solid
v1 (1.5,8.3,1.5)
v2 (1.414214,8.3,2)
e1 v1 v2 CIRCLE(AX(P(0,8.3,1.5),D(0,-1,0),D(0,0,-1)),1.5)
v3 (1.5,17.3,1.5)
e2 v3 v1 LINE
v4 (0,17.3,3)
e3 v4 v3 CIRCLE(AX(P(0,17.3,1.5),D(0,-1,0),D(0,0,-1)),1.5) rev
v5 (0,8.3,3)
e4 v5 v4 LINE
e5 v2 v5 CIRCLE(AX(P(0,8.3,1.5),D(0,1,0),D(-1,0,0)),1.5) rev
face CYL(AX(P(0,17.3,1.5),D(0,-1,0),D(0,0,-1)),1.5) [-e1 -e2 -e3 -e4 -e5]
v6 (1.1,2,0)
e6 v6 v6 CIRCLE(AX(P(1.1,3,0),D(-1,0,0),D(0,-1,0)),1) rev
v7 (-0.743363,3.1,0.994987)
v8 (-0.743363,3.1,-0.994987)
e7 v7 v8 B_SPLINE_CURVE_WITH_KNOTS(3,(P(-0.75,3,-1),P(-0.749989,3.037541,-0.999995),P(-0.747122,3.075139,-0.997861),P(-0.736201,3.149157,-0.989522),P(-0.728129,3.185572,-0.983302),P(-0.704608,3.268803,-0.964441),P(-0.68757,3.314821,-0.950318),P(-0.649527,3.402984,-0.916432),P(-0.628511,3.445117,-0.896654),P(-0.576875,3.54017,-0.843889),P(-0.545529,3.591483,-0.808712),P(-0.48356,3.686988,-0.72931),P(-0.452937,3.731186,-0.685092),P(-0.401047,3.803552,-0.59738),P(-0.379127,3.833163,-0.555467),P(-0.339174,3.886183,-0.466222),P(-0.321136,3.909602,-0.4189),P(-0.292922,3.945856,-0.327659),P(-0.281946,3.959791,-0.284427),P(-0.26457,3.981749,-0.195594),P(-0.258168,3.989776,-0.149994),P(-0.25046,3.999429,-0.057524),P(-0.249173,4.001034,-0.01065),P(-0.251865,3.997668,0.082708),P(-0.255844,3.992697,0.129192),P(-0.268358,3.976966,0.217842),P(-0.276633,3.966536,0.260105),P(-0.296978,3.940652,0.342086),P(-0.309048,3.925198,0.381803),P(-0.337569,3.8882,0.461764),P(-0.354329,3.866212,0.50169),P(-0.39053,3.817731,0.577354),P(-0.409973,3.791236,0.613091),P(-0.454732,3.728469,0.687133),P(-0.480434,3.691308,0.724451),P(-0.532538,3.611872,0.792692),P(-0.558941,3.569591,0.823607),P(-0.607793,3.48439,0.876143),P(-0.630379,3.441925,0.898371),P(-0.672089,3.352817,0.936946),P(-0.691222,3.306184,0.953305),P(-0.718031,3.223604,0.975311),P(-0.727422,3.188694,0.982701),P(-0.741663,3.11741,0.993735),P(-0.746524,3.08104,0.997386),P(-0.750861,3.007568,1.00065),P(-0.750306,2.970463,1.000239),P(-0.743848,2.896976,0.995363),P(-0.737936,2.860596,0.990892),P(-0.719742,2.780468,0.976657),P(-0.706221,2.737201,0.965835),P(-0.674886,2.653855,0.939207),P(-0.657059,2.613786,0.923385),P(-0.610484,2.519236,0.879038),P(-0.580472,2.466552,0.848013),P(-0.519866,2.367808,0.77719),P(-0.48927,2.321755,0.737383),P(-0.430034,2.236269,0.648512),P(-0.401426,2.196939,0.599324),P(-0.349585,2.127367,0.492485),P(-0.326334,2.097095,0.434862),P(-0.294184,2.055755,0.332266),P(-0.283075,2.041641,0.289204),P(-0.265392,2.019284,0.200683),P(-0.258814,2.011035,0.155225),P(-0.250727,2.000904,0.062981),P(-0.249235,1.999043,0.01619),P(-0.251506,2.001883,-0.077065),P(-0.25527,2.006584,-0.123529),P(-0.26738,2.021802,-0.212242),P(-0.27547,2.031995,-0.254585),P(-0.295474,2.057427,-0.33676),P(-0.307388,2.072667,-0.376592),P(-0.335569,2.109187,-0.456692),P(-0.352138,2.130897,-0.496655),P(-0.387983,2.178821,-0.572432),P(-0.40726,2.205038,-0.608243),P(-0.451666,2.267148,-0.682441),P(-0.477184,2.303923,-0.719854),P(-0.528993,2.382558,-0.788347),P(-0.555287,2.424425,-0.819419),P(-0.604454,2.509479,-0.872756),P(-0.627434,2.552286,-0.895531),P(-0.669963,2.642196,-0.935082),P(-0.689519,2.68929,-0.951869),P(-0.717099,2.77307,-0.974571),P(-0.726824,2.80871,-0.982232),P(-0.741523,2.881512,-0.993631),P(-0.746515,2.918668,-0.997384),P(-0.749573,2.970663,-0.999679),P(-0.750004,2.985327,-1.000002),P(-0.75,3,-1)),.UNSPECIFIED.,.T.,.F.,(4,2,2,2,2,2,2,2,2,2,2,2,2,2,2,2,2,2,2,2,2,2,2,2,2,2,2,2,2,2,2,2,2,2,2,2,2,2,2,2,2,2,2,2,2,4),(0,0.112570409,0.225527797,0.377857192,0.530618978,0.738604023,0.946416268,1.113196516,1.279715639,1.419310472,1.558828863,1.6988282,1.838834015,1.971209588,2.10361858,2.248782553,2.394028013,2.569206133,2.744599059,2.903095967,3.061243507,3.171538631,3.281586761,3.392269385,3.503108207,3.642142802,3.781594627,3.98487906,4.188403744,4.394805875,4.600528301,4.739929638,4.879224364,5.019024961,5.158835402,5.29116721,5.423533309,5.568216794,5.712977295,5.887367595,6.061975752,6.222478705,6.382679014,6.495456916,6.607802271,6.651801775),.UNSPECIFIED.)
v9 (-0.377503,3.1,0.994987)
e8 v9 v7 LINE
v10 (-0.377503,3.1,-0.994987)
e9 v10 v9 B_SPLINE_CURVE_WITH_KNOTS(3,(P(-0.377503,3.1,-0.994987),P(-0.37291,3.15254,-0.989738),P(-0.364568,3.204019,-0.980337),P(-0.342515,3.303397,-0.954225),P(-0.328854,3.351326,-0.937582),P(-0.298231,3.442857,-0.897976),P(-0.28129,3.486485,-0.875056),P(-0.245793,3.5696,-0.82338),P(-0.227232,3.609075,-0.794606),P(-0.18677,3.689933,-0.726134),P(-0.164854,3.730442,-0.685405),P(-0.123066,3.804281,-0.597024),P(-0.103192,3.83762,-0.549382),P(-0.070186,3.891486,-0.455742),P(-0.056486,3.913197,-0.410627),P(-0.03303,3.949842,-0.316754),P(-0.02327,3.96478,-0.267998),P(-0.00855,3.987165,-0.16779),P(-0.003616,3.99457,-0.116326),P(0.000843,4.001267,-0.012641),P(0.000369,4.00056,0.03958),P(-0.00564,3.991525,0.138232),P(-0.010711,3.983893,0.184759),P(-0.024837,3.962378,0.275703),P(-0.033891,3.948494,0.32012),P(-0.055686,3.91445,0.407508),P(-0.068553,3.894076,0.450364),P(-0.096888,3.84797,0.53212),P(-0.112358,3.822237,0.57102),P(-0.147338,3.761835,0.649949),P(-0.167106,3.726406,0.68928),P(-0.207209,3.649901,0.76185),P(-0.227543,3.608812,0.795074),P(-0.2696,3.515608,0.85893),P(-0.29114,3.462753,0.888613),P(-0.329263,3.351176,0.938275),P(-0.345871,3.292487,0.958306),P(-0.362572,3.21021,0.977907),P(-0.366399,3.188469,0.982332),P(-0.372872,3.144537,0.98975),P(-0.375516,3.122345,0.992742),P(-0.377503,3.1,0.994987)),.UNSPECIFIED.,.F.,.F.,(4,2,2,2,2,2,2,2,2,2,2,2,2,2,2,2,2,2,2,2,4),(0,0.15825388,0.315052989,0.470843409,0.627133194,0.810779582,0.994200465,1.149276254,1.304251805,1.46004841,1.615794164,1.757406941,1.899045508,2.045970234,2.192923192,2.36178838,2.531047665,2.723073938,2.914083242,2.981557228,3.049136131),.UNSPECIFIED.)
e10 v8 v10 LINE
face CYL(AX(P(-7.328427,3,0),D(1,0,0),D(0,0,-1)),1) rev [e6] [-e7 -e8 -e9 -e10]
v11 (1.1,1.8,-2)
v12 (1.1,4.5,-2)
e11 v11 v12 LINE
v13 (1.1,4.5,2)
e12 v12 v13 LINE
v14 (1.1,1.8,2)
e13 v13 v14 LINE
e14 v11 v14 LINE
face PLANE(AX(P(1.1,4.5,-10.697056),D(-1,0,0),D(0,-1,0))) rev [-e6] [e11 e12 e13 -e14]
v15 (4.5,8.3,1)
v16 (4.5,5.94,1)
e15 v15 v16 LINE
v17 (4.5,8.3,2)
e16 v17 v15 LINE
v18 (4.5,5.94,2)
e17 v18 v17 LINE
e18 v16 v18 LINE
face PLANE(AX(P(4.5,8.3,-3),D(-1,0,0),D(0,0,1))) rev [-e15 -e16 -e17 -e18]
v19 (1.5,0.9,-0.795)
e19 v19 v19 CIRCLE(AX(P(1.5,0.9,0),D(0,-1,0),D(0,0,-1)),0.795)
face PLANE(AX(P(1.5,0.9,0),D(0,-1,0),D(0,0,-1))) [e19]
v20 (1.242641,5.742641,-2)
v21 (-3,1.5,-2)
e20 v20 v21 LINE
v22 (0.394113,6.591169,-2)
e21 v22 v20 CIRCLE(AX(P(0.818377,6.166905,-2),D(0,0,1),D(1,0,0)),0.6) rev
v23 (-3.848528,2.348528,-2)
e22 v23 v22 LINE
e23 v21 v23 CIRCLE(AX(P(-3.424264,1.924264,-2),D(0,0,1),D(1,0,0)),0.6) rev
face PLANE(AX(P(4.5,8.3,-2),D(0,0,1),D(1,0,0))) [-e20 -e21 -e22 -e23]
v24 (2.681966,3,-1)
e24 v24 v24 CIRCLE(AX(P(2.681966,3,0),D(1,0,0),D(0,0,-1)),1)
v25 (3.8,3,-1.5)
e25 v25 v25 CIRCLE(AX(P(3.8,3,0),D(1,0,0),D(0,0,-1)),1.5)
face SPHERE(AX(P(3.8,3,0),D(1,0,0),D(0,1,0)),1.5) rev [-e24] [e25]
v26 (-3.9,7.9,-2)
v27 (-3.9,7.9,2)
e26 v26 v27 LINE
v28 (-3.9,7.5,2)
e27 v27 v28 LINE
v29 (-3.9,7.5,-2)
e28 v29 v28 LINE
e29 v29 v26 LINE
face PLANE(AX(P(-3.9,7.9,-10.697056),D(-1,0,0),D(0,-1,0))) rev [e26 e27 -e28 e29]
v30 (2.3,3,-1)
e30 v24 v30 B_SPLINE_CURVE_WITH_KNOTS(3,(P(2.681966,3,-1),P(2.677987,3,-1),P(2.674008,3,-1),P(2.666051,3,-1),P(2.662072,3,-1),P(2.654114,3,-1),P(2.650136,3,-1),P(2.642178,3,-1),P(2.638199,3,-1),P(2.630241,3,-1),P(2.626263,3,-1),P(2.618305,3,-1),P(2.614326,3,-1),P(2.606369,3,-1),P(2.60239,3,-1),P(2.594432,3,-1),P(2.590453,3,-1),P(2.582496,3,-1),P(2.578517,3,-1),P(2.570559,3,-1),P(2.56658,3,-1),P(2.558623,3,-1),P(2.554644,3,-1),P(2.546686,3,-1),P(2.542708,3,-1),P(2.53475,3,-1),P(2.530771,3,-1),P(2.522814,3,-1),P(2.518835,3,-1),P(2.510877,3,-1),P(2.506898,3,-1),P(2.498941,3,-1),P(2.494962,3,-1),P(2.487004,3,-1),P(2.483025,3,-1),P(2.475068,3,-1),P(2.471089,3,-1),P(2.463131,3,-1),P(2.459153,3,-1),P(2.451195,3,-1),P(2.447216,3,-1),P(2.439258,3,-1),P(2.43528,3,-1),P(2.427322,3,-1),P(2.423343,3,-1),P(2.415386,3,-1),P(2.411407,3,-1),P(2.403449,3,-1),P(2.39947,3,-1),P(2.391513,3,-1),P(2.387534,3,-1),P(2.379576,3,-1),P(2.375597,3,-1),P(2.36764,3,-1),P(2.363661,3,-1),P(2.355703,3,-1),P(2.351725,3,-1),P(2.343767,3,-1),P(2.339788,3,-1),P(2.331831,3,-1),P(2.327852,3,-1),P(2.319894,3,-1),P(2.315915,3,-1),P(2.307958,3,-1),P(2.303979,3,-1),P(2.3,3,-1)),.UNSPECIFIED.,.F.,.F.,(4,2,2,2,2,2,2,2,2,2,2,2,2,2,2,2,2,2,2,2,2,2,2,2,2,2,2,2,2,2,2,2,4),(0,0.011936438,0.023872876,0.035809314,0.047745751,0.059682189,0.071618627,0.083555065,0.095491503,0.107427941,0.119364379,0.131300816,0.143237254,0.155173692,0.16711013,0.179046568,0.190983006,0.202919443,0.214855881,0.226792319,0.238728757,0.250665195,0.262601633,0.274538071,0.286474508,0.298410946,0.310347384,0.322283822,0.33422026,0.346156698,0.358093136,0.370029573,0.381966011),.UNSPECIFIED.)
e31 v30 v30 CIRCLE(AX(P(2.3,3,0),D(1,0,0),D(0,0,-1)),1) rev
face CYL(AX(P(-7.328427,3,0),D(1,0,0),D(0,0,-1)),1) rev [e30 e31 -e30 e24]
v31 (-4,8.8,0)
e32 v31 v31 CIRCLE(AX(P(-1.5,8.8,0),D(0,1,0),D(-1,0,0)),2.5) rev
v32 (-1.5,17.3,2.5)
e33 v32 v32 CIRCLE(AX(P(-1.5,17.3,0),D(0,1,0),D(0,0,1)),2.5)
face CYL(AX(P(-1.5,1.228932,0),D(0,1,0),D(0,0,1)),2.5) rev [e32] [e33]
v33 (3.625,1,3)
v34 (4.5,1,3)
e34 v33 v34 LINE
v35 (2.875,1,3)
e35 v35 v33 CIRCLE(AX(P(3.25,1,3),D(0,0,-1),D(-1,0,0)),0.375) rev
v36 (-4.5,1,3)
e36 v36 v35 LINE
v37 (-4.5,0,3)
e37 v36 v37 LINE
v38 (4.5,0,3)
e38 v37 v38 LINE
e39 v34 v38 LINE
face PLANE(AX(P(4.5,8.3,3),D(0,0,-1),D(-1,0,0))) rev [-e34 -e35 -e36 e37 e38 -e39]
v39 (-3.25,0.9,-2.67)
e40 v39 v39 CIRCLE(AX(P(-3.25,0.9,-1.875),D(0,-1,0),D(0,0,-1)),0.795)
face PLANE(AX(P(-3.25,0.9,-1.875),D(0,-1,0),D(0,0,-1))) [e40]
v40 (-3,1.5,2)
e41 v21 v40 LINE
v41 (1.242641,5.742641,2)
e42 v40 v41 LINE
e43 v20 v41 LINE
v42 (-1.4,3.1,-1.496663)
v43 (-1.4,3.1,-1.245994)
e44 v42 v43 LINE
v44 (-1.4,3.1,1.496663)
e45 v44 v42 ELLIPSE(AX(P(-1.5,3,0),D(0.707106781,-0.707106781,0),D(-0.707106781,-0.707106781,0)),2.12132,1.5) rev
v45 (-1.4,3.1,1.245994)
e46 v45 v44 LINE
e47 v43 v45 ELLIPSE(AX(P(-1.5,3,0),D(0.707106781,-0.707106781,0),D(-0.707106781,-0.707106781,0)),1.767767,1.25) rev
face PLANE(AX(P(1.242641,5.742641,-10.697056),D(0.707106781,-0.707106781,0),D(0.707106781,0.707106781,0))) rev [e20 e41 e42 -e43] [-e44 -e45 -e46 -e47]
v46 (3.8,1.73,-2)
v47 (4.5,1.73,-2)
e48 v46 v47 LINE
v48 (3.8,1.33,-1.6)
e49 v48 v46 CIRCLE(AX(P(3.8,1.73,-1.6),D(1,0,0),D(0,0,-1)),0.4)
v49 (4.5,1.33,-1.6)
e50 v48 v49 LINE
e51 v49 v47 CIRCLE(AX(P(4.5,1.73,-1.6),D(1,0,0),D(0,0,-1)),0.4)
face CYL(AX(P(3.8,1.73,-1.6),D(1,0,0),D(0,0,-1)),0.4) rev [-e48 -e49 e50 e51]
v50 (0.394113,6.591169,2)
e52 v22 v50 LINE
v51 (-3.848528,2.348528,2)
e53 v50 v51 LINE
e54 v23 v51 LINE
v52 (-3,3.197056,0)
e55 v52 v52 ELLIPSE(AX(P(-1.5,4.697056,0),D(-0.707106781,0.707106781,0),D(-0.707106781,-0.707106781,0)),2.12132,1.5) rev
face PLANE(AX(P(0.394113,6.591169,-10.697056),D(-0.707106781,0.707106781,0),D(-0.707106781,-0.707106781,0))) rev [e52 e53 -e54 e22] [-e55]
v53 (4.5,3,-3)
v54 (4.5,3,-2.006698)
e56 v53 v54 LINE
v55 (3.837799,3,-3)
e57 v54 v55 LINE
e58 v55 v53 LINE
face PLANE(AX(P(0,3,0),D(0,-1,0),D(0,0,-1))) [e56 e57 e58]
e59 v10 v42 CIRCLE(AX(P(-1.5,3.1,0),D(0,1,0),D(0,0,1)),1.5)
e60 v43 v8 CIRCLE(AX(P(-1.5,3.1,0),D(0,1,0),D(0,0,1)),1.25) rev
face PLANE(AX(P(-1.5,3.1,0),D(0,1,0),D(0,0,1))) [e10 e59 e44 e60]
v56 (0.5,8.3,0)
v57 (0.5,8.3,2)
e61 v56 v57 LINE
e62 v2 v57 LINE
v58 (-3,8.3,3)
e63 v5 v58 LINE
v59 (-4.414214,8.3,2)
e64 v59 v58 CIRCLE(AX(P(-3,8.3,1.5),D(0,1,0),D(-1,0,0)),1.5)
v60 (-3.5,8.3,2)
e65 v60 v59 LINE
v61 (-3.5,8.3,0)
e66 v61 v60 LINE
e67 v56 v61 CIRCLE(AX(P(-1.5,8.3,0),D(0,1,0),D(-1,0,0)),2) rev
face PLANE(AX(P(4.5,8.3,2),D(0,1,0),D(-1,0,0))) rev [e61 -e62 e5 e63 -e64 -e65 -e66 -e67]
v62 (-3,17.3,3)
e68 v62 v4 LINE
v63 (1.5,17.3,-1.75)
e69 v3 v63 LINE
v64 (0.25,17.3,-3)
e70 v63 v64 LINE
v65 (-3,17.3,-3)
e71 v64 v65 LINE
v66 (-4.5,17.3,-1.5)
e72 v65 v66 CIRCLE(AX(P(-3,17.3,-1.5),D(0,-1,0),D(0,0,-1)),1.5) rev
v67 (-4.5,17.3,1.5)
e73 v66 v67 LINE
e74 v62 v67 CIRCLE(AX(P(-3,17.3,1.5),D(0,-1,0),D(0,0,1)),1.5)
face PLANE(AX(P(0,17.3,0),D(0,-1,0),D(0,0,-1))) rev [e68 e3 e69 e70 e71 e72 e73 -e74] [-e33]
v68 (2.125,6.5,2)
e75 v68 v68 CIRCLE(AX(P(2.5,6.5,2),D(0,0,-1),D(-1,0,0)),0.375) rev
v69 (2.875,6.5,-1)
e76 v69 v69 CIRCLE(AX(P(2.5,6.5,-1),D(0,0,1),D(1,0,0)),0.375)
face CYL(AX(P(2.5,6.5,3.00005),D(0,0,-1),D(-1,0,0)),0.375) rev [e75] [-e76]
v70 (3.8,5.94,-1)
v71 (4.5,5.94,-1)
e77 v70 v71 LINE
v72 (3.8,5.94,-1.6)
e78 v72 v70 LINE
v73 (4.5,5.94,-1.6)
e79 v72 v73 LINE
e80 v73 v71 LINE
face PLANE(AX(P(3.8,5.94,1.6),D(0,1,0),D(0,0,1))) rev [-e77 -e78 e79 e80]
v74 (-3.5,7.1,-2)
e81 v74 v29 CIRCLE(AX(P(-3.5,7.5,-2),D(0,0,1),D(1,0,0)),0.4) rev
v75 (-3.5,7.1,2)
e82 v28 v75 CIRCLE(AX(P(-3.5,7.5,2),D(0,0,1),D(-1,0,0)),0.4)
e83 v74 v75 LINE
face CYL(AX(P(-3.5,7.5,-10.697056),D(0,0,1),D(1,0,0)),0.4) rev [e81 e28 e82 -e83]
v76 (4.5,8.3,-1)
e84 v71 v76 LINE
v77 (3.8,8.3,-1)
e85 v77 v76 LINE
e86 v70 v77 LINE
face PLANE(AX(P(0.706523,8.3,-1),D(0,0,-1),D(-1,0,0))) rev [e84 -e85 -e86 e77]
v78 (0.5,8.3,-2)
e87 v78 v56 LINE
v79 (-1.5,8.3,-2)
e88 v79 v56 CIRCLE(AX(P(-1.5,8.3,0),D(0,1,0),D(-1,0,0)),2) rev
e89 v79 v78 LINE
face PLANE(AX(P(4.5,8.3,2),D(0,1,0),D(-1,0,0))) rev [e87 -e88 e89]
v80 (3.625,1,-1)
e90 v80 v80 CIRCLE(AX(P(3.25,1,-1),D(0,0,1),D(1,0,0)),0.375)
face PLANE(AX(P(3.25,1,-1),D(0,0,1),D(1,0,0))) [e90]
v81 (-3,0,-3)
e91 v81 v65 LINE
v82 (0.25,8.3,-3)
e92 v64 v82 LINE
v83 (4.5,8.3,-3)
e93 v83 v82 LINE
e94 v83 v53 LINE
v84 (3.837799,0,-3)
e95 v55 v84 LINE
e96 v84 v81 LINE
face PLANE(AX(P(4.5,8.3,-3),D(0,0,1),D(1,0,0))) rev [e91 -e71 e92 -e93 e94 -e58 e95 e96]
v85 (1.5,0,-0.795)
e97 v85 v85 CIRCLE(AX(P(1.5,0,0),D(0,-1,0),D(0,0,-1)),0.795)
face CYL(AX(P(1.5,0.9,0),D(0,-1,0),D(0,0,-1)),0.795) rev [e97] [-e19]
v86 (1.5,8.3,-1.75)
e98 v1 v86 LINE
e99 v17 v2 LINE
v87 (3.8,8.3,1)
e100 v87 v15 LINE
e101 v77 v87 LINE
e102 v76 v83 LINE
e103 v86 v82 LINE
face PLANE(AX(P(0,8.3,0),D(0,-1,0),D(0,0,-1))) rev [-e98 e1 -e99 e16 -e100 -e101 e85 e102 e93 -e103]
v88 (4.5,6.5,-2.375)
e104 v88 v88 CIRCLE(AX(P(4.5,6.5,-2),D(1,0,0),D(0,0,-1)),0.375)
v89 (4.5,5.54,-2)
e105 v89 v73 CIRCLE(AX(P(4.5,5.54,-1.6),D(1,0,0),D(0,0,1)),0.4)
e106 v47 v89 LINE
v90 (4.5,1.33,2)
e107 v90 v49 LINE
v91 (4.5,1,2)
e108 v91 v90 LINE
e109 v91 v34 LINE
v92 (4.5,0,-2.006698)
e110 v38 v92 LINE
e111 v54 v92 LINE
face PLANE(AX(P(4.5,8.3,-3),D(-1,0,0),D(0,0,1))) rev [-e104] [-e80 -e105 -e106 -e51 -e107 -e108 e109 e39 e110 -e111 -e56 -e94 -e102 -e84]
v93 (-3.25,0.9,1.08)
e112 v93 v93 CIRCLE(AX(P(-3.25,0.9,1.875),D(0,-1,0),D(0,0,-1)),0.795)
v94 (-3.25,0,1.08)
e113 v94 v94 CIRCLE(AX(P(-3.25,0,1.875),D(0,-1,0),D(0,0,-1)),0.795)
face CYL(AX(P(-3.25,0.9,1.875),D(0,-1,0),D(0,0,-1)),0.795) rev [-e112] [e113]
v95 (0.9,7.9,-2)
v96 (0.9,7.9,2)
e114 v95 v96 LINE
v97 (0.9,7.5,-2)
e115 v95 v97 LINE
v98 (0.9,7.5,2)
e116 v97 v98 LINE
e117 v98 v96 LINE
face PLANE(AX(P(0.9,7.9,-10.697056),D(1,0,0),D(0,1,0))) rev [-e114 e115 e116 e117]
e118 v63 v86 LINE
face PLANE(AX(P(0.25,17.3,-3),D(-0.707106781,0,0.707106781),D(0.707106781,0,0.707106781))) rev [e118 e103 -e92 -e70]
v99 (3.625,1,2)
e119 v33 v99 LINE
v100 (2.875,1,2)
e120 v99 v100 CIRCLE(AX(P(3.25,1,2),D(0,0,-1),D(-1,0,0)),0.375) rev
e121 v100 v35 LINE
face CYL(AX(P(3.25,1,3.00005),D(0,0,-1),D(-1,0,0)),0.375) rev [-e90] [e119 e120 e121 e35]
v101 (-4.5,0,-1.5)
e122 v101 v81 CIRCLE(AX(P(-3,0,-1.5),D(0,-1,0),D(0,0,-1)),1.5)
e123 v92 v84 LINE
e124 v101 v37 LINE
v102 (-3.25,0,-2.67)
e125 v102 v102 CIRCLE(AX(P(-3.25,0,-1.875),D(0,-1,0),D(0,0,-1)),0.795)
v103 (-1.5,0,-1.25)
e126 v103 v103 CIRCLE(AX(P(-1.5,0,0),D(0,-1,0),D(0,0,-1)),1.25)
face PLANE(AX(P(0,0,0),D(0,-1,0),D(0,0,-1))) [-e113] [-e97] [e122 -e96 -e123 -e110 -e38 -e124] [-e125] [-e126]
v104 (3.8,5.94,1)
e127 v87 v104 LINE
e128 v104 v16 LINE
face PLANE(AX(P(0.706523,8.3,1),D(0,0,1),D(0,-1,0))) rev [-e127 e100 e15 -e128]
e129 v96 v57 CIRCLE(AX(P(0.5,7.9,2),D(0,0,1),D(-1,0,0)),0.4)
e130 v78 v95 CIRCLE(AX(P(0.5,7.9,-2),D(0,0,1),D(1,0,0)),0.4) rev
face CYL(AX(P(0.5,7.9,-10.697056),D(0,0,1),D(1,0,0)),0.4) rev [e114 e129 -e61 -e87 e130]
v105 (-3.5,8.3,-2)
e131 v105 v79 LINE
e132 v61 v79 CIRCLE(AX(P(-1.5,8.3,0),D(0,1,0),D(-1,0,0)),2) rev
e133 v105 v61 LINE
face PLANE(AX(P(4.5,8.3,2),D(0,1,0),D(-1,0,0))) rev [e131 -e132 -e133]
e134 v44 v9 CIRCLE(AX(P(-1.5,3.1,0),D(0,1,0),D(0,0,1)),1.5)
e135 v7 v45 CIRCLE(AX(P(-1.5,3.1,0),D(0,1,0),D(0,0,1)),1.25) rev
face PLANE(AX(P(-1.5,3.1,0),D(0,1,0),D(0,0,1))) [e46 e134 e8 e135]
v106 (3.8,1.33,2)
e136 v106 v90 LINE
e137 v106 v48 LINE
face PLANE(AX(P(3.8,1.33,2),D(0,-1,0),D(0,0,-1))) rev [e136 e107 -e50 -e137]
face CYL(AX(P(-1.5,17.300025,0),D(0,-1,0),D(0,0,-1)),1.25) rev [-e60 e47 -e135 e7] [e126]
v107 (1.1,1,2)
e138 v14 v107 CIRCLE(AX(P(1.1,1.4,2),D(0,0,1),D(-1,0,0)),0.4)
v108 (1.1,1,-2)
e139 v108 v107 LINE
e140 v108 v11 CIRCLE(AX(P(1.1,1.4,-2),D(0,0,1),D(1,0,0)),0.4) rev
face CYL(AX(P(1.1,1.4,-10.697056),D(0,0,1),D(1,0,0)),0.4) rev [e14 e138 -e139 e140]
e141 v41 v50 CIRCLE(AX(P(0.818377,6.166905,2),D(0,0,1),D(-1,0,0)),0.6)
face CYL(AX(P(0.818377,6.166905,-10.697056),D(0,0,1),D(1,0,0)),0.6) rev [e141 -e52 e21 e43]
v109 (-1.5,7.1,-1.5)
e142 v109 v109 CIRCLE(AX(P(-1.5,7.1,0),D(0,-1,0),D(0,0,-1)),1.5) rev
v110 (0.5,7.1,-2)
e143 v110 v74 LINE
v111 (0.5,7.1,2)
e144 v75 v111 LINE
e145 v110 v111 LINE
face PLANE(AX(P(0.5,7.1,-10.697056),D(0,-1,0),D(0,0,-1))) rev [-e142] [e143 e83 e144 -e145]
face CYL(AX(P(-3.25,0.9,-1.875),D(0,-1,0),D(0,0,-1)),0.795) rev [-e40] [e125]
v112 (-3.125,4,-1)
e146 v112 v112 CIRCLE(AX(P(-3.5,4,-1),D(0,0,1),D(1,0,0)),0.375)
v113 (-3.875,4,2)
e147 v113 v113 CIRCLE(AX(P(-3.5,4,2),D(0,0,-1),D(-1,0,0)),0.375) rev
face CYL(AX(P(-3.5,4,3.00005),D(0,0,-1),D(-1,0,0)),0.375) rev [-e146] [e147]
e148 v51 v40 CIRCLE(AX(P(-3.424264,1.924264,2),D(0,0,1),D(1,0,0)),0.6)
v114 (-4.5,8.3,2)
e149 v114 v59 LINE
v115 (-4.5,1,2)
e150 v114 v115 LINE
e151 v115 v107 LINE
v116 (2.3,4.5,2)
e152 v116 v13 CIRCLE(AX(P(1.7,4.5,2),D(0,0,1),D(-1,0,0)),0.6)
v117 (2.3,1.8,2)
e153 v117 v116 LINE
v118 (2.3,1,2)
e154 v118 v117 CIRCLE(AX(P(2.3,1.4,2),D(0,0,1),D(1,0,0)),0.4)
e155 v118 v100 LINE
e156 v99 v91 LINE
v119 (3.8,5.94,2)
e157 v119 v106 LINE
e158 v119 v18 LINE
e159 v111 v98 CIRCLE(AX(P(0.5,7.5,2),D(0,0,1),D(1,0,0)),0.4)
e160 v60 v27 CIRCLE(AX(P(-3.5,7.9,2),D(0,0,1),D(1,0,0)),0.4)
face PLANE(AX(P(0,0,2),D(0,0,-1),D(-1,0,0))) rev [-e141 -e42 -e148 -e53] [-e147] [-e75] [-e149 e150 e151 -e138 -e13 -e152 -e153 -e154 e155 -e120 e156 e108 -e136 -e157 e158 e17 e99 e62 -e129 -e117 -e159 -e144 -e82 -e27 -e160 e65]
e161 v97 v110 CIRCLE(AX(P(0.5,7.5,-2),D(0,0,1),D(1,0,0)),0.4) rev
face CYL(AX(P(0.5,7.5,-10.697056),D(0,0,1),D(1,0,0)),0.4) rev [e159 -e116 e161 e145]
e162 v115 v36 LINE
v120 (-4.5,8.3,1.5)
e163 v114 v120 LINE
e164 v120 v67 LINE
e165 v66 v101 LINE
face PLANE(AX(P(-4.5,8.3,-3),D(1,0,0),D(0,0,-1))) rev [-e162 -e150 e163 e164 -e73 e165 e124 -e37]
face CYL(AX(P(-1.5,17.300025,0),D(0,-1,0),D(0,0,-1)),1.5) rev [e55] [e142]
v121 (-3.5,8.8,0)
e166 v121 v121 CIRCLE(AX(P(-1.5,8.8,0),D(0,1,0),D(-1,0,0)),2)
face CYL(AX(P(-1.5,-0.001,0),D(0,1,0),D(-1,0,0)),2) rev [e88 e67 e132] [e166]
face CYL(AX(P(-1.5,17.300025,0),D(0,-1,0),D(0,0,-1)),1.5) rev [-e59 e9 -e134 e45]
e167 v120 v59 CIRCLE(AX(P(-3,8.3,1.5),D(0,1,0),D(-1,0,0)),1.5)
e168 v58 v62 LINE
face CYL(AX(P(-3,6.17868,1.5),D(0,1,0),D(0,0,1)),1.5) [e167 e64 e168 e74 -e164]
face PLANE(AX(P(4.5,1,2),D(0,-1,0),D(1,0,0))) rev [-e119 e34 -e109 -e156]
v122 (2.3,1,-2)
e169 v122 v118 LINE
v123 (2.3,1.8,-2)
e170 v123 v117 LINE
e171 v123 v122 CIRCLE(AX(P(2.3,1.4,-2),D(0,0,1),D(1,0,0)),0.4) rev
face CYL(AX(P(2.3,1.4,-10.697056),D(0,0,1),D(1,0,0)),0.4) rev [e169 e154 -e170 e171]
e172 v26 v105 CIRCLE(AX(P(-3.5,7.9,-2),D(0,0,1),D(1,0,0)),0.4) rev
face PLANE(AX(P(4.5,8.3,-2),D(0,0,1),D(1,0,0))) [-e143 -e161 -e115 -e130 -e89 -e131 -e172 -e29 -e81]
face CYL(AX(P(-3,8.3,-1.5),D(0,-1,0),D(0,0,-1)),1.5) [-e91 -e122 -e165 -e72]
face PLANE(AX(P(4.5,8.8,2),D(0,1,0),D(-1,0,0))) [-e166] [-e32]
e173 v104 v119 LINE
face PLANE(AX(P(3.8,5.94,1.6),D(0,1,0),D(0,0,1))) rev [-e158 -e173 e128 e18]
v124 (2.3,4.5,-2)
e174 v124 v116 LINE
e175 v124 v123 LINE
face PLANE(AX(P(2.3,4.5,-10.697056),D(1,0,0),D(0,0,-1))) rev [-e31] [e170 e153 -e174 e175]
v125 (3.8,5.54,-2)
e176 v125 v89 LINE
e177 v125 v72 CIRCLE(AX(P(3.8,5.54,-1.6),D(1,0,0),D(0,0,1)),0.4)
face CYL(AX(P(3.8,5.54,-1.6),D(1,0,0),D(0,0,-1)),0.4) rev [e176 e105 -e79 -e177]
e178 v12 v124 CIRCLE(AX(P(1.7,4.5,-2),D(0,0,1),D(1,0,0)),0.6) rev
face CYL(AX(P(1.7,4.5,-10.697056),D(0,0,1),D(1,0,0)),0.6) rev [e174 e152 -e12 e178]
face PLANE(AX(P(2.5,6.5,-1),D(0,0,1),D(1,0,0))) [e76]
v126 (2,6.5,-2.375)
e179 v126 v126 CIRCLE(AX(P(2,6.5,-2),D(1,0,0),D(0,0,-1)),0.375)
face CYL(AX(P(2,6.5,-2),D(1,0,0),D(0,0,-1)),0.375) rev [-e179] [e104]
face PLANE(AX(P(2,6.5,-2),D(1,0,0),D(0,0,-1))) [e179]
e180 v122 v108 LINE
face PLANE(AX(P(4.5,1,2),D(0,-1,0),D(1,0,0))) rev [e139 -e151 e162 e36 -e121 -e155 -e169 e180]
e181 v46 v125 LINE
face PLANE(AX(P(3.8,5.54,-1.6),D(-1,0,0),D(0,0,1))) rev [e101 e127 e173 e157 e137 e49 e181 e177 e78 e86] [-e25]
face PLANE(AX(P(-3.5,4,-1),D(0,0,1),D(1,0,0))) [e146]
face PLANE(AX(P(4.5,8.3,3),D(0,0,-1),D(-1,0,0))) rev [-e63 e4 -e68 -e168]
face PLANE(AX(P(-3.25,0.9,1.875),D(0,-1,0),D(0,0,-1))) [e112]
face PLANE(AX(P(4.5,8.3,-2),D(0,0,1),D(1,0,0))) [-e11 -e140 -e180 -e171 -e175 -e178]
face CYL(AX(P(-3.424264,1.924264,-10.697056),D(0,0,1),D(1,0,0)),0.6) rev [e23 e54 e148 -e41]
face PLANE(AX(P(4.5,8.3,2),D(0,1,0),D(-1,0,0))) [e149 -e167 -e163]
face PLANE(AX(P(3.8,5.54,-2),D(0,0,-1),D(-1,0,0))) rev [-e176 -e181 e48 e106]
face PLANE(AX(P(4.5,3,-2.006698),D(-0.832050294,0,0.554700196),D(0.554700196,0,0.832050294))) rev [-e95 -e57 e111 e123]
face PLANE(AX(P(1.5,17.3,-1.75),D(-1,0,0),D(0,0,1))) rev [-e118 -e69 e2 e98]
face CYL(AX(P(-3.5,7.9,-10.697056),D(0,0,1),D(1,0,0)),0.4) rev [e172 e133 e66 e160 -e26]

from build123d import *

# Parameters (mm, degrees)
SKETCH1_W                   = 9
SKETCH1_H                   = 6
MAIN_BODY_EXT_DEPTH         = 8.3
EMISSION_PATH_EXT_DEPTH     = 9
SKETCH3_R                   = 1.25
EMISSION_AND_GRIN_CUT_DEPTH = 19.125672401
SKETCH4_R                   = 1
DRUM_LENS_CUT_DEPTH         = 7
SKETCH5_W                   = 9
SKETCH5_H                   = 7.3
FILTERSET_CUT1_DEPTH        = 1
FILTERSET_CUT2_DEPTH        = 4
SKETCH10_R                  = 2.5
EMISSION_LENS_CUT_DEPTH     = 8.5
SKETCH15_R                  = 0.795
MAGNETS_CUT_DEPTH           = 0.9
SCREW_HOLES_CUT_DEPTH       = 19.561788707
SCREW_HOLES_CUT_DEPTH_BACK  = 3
SKETCH18_R                  = 0.375
EXTERNAL_FILLET_1_R         = 1.5
CUT_EXTRUDE8_DEPTH          = 12.545128843
CUT_EXTRUDE8_DEPTH_BACK     = 4
SKETCH28_R                  = 1.5
CUT_EXTRUDE9_DEPTH          = 3
CUT_EXTRUDE10_DEPTH         = 0.7
SKETCH29_R                  = 0.375
CUT_EXTRUDE11_DEPTH         = 2.5
SKETCH32_W                  = 2
SKETCH32_H                  = 2.36
CUT_EXTRUDE14_DEPTH         = 0.7
CUT_EXTRUDE16_DEPTH         = 9
CUT_EXTRUDE17_REACH         = 12.329
SKETCH37_R                  = 2


with BuildPart() as part:
    # Sketch1 → Main Body Ext (new body)
    with BuildSketch(Plane(origin=(0, 0, 0), x_dir=(1, 0, 0), z_dir=(0, 1, 0))):
        Rectangle(SKETCH1_W, SKETCH1_H)
    extrude(amount=MAIN_BODY_EXT_DEPTH)

    # Sketch8 → Emission Path Ext (add)
    with BuildSketch(Plane(origin=(0, 8.3, 0), x_dir=(1, 0, 0), z_dir=(0, 1, 0))):
        Polygon((0.25, 3), (1.5, 1.75), (1.5, -3), (-4.5, -3), (-4.5, 3), align=None)
    extrude(amount=EMISSION_PATH_EXT_DEPTH)

    # Sketch3 → Emission and Grin Cut (cut, through all)
    with BuildSketch(Plane.XZ):
        with Locations(Location((-1.5, 0, 0), (0, 0, 270))):
            Circle(SKETCH3_R)
    extrude(amount=-EMISSION_AND_GRIN_CUT_DEPTH, mode=Mode.SUBTRACT)

    # Sketch4 → Drum Lens Cut (cut)
    with BuildSketch(Plane(origin=(4.5, 0, 0), x_dir=(0, 0, -1), z_dir=(1, 0, 0))):
        with Locations((0, 3)):
            Circle(SKETCH4_R)
    extrude(amount=-DRUM_LENS_CUT_DEPTH, mode=Mode.SUBTRACT)

    # Sketch5 → FilterSet Cut1 (cut)
    with BuildSketch(Plane.XY.offset(3)):
        with Locations((0, 4.65)):
            Rectangle(SKETCH5_W, SKETCH5_H)
    extrude(amount=-FILTERSET_CUT1_DEPTH, mode=Mode.SUBTRACT)

    # Sketch6 → FilterSet Cut2 (cut)
    with BuildSketch(Plane.XY.offset(2)):
        with BuildLine():
            Line((2.3, 4.5), (2.3, 1.8))
            ThreePointArc((2.3, 1.8), (2.7, 1.4), (2.3, 1))
            Line((2.3, 1), (1.1, 1))
            ThreePointArc((1.1, 1), (0.7, 1.4), (1.1, 1.8))
            Line((1.1, 1.8), (1.1, 4.5))
            ThreePointArc((1.1, 4.5), (1.7, 5.1), (2.3, 4.5))
        make_face()
        with BuildLine():
            Line((-3.9, 7.9), (-3.9, 7.5))
            ThreePointArc((-3.9, 7.5), (-3.782842712, 7.217157288), (-3.5, 7.1))
            Line((-3.5, 7.1), (0.5, 7.1))
            ThreePointArc((0.5, 7.1), (0.782842712, 7.217157288), (0.9, 7.5))
            Line((0.9, 7.5), (0.9, 7.9))
            ThreePointArc((0.9, 7.9), (0.782842712, 8.182842712), (0.5, 8.3))
            Line((0.5, 8.3), (-3.5, 8.3))
            ThreePointArc((-3.5, 8.3), (-3.782842712, 8.182842712), (-3.9, 7.9))
        make_face()
        with BuildLine():
            Line((0.39411255, 6.591168825), (-3.848528137, 2.348528137))
            ThreePointArc((-3.848528137, 2.348528137), (-3.848528137, 1.5), (-3, 1.5))
            Line((-3, 1.5), (1.242640687, 5.742640687))
            ThreePointArc((1.242640687, 5.742640687), (1.242640687, 6.591168825), (0.39411255, 6.591168825))
        make_face()
    extrude(amount=-FILTERSET_CUT2_DEPTH, mode=Mode.SUBTRACT)

    # Sketch10 → Emission Lens Cut (cut)
    with BuildSketch(Plane(origin=(0, 17.3, 0), x_dir=(1, 0, 0), z_dir=(0, 1, 0))):
        with Locations(Location((-1.5, 0, 0), (0, 0, 270))):
            Circle(SKETCH10_R)
    extrude(amount=-EMISSION_LENS_CUT_DEPTH, mode=Mode.SUBTRACT)

    # Sketch15 → Magnets Cut (cut)
    with BuildSketch(Plane.XZ):
        with Locations(Location((-3.25, -1.875, 0), (0, 0, 270))):
            Circle(SKETCH15_R)
        with Locations(Location((-3.25, 1.875, 0), (0, 0, 270))):
            Circle(SKETCH15_R)
        with Locations(Location((1.5, 0, 0), (0, 0, 270))):
            Circle(SKETCH15_R)
    extrude(amount=-MAGNETS_CUT_DEPTH, mode=Mode.SUBTRACT)

    # Sketch18 → Screw Holes Cut (cut, two sides: drawn at the far end of the back side and taken through both)
    with BuildSketch(Plane.XY.offset(2).offset(-SCREW_HOLES_CUT_DEPTH_BACK)):
        with Locations(Location((-3.5, 4, 0), (0, 0, 180))):
            Circle(SKETCH18_R)
        with Locations(Location((2.5, 6.5, 0), (0, 0, 180))):
            Circle(SKETCH18_R)
        with Locations((3.25, 1)):
            Circle(SKETCH18_R)
    extrude(amount=SCREW_HOLES_CUT_DEPTH + SCREW_HOLES_CUT_DEPTH_BACK, mode=Mode.SUBTRACT)

    # External Fillet 1
    # the kernel refuses this fillet: 1.5 mm, written as the material it takes off along each edge
    with BuildSketch(Plane(origin=(1.5, 8.3, 3), x_dir=(0, 0, -1), z_dir=(0, 1, 0))) as external_fillet_1_piece_1:
        with BuildLine():
            CenterArc((EXTERNAL_FILLET_1_R, EXTERNAL_FILLET_1_R), EXTERNAL_FILLET_1_R, 180, 90)
            Line((0, EXTERNAL_FILLET_1_R), (0, 0))
            Line((0, 0), (EXTERNAL_FILLET_1_R, 0))
        make_face()
    extrude(amount=12.75, mode=Mode.SUBTRACT)
    with BuildSketch(Plane(origin=(-4.5, -3.75, -3), x_dir=(1, 0, 0), z_dir=(0, 1, 0))) as external_fillet_1_piece_2:
        with BuildLine():
            CenterArc((EXTERNAL_FILLET_1_R, -EXTERNAL_FILLET_1_R), EXTERNAL_FILLET_1_R, 90, 90)
            Line((0, -EXTERNAL_FILLET_1_R), (0, 0))
            Line((0, 0), (EXTERNAL_FILLET_1_R, 0))
        make_face()
    extrude(amount=24.8, mode=Mode.SUBTRACT)

    # Sketch28 → Cut-Extrude8 (cut, two sides: drawn at the far end of the back side and taken through both)
    with BuildSketch(Plane(origin=(0, 7.1, 0), x_dir=(1, 0, 0), z_dir=(0, 1, 0)).offset(-CUT_EXTRUDE8_DEPTH_BACK)):
        with Locations(Location((-1.5, 0, 0), (0, 0, 180))):
            Circle(SKETCH28_R)
    extrude(amount=CUT_EXTRUDE8_DEPTH + CUT_EXTRUDE8_DEPTH_BACK, mode=Mode.SUBTRACT)

    # Sketch14 → Cut-Extrude9 (cut)
    with BuildSketch(Plane.XZ):
        Polygon((4.5, -3), (4.5, -2.006698359), (3.837798906, -3), align=None)
    extrude(amount=-CUT_EXTRUDE9_DEPTH, mode=Mode.SUBTRACT)

    # Sketch12 → Cut-Extrude10 (cut)
    with BuildSketch(Plane(origin=(4.5, 0, 0), x_dir=(0, 0, -1), z_dir=(1, 0, 0))):
        with BuildLine():
            Line((1.6, 5.94), (-1.6, 5.94))
            Line((-1.6, 5.94), (-2, 5.94))
            Line((-2, 5.94), (-2, 1.33))
            Line((-2, 1.33), (1.6, 1.33))
            ThreePointArc((1.6, 1.33), (1.882842712, 1.447157288), (2, 1.73))
            Line((2, 1.73), (2, 5.54))
            ThreePointArc((2, 5.54), (1.882842712, 5.822842712), (1.6, 5.94))
        make_face()
    extrude(amount=-CUT_EXTRUDE10_DEPTH, mode=Mode.SUBTRACT)

    # Sketch29 → Cut-Extrude11 (cut)
    with BuildSketch(Plane(origin=(4.5, 0, 0), x_dir=(0, 0, -1), z_dir=(1, 0, 0))):
        with Locations((2, 6.5)):
            Circle(SKETCH29_R)
    extrude(amount=-CUT_EXTRUDE11_DEPTH, mode=Mode.SUBTRACT)

    # Sketch32 → Cut-Extrude14 (cut)
    with BuildSketch(Plane(origin=(4.5, 0, 0), x_dir=(0, 0, -1), z_dir=(1, 0, 0))):
        with Locations((0, 7.12)):
            Rectangle(SKETCH32_W, SKETCH32_H)
    extrude(amount=-CUT_EXTRUDE14_DEPTH, mode=Mode.SUBTRACT)

    # Sketch33 → Cut-Revolve1 (revolve, cut)
    with BuildSketch(Plane.XY, mode=Mode.PRIVATE) as cut_revolve1_sk:
        with BuildLine():
            Line((3.8, 3), (2.3, 3))
            ThreePointArc((2.3, 3), (2.739339828, 4.060660172), (3.8, 4.5))
            Line((3.8, 4.5), (3.8, 3))
        make_face()
    revolve(cut_revolve1_sk.sketch.rotate(Axis((3.8, 3, 0), (-1, 0, 0)), 90), axis=Axis((3.8, 3, 0), (-1, 0, 0)), mode=Mode.SUBTRACT)

    # Sketch36 → Cut-Extrude16 (cut)
    with BuildSketch(Plane(origin=(0, 17.3, 0), x_dir=(1, 0, 0), z_dir=(0, 1, 0))):
        with BuildLine():
            Line((-4.5, -1.5), (-4.5, -3))
            Line((-4.5, -3), (-3, -3))
            ThreePointArc((-3, -3), (-4.060660172, -2.560660172), (-4.5, -1.5))
        make_face()
    extrude(amount=-CUT_EXTRUDE16_DEPTH, mode=Mode.SUBTRACT)

    # Sketch37 → Cut-Extrude17 (cut, up to next)
    with BuildSketch(Plane(origin=(0, 8.8, 0), x_dir=(1, 0, 0), z_dir=(0, 1, 0)), mode=Mode.PRIVATE) as cut_extrude17_sk1:
        with Locations(Location((-1.5, 0, 0), (0, 0, 180))):
            Circle(SKETCH37_R)
    cut_extrude17_tool1 = extrude(cut_extrude17_sk1.sketch, amount=-CUT_EXTRUDE17_REACH, mode=Mode.PRIVATE) & part.part
    add(cut_extrude17_tool1.solids().sort_by_distance((-1.5, 8.8, 0))[0], mode=Mode.SUBTRACT)


solid = part.part
